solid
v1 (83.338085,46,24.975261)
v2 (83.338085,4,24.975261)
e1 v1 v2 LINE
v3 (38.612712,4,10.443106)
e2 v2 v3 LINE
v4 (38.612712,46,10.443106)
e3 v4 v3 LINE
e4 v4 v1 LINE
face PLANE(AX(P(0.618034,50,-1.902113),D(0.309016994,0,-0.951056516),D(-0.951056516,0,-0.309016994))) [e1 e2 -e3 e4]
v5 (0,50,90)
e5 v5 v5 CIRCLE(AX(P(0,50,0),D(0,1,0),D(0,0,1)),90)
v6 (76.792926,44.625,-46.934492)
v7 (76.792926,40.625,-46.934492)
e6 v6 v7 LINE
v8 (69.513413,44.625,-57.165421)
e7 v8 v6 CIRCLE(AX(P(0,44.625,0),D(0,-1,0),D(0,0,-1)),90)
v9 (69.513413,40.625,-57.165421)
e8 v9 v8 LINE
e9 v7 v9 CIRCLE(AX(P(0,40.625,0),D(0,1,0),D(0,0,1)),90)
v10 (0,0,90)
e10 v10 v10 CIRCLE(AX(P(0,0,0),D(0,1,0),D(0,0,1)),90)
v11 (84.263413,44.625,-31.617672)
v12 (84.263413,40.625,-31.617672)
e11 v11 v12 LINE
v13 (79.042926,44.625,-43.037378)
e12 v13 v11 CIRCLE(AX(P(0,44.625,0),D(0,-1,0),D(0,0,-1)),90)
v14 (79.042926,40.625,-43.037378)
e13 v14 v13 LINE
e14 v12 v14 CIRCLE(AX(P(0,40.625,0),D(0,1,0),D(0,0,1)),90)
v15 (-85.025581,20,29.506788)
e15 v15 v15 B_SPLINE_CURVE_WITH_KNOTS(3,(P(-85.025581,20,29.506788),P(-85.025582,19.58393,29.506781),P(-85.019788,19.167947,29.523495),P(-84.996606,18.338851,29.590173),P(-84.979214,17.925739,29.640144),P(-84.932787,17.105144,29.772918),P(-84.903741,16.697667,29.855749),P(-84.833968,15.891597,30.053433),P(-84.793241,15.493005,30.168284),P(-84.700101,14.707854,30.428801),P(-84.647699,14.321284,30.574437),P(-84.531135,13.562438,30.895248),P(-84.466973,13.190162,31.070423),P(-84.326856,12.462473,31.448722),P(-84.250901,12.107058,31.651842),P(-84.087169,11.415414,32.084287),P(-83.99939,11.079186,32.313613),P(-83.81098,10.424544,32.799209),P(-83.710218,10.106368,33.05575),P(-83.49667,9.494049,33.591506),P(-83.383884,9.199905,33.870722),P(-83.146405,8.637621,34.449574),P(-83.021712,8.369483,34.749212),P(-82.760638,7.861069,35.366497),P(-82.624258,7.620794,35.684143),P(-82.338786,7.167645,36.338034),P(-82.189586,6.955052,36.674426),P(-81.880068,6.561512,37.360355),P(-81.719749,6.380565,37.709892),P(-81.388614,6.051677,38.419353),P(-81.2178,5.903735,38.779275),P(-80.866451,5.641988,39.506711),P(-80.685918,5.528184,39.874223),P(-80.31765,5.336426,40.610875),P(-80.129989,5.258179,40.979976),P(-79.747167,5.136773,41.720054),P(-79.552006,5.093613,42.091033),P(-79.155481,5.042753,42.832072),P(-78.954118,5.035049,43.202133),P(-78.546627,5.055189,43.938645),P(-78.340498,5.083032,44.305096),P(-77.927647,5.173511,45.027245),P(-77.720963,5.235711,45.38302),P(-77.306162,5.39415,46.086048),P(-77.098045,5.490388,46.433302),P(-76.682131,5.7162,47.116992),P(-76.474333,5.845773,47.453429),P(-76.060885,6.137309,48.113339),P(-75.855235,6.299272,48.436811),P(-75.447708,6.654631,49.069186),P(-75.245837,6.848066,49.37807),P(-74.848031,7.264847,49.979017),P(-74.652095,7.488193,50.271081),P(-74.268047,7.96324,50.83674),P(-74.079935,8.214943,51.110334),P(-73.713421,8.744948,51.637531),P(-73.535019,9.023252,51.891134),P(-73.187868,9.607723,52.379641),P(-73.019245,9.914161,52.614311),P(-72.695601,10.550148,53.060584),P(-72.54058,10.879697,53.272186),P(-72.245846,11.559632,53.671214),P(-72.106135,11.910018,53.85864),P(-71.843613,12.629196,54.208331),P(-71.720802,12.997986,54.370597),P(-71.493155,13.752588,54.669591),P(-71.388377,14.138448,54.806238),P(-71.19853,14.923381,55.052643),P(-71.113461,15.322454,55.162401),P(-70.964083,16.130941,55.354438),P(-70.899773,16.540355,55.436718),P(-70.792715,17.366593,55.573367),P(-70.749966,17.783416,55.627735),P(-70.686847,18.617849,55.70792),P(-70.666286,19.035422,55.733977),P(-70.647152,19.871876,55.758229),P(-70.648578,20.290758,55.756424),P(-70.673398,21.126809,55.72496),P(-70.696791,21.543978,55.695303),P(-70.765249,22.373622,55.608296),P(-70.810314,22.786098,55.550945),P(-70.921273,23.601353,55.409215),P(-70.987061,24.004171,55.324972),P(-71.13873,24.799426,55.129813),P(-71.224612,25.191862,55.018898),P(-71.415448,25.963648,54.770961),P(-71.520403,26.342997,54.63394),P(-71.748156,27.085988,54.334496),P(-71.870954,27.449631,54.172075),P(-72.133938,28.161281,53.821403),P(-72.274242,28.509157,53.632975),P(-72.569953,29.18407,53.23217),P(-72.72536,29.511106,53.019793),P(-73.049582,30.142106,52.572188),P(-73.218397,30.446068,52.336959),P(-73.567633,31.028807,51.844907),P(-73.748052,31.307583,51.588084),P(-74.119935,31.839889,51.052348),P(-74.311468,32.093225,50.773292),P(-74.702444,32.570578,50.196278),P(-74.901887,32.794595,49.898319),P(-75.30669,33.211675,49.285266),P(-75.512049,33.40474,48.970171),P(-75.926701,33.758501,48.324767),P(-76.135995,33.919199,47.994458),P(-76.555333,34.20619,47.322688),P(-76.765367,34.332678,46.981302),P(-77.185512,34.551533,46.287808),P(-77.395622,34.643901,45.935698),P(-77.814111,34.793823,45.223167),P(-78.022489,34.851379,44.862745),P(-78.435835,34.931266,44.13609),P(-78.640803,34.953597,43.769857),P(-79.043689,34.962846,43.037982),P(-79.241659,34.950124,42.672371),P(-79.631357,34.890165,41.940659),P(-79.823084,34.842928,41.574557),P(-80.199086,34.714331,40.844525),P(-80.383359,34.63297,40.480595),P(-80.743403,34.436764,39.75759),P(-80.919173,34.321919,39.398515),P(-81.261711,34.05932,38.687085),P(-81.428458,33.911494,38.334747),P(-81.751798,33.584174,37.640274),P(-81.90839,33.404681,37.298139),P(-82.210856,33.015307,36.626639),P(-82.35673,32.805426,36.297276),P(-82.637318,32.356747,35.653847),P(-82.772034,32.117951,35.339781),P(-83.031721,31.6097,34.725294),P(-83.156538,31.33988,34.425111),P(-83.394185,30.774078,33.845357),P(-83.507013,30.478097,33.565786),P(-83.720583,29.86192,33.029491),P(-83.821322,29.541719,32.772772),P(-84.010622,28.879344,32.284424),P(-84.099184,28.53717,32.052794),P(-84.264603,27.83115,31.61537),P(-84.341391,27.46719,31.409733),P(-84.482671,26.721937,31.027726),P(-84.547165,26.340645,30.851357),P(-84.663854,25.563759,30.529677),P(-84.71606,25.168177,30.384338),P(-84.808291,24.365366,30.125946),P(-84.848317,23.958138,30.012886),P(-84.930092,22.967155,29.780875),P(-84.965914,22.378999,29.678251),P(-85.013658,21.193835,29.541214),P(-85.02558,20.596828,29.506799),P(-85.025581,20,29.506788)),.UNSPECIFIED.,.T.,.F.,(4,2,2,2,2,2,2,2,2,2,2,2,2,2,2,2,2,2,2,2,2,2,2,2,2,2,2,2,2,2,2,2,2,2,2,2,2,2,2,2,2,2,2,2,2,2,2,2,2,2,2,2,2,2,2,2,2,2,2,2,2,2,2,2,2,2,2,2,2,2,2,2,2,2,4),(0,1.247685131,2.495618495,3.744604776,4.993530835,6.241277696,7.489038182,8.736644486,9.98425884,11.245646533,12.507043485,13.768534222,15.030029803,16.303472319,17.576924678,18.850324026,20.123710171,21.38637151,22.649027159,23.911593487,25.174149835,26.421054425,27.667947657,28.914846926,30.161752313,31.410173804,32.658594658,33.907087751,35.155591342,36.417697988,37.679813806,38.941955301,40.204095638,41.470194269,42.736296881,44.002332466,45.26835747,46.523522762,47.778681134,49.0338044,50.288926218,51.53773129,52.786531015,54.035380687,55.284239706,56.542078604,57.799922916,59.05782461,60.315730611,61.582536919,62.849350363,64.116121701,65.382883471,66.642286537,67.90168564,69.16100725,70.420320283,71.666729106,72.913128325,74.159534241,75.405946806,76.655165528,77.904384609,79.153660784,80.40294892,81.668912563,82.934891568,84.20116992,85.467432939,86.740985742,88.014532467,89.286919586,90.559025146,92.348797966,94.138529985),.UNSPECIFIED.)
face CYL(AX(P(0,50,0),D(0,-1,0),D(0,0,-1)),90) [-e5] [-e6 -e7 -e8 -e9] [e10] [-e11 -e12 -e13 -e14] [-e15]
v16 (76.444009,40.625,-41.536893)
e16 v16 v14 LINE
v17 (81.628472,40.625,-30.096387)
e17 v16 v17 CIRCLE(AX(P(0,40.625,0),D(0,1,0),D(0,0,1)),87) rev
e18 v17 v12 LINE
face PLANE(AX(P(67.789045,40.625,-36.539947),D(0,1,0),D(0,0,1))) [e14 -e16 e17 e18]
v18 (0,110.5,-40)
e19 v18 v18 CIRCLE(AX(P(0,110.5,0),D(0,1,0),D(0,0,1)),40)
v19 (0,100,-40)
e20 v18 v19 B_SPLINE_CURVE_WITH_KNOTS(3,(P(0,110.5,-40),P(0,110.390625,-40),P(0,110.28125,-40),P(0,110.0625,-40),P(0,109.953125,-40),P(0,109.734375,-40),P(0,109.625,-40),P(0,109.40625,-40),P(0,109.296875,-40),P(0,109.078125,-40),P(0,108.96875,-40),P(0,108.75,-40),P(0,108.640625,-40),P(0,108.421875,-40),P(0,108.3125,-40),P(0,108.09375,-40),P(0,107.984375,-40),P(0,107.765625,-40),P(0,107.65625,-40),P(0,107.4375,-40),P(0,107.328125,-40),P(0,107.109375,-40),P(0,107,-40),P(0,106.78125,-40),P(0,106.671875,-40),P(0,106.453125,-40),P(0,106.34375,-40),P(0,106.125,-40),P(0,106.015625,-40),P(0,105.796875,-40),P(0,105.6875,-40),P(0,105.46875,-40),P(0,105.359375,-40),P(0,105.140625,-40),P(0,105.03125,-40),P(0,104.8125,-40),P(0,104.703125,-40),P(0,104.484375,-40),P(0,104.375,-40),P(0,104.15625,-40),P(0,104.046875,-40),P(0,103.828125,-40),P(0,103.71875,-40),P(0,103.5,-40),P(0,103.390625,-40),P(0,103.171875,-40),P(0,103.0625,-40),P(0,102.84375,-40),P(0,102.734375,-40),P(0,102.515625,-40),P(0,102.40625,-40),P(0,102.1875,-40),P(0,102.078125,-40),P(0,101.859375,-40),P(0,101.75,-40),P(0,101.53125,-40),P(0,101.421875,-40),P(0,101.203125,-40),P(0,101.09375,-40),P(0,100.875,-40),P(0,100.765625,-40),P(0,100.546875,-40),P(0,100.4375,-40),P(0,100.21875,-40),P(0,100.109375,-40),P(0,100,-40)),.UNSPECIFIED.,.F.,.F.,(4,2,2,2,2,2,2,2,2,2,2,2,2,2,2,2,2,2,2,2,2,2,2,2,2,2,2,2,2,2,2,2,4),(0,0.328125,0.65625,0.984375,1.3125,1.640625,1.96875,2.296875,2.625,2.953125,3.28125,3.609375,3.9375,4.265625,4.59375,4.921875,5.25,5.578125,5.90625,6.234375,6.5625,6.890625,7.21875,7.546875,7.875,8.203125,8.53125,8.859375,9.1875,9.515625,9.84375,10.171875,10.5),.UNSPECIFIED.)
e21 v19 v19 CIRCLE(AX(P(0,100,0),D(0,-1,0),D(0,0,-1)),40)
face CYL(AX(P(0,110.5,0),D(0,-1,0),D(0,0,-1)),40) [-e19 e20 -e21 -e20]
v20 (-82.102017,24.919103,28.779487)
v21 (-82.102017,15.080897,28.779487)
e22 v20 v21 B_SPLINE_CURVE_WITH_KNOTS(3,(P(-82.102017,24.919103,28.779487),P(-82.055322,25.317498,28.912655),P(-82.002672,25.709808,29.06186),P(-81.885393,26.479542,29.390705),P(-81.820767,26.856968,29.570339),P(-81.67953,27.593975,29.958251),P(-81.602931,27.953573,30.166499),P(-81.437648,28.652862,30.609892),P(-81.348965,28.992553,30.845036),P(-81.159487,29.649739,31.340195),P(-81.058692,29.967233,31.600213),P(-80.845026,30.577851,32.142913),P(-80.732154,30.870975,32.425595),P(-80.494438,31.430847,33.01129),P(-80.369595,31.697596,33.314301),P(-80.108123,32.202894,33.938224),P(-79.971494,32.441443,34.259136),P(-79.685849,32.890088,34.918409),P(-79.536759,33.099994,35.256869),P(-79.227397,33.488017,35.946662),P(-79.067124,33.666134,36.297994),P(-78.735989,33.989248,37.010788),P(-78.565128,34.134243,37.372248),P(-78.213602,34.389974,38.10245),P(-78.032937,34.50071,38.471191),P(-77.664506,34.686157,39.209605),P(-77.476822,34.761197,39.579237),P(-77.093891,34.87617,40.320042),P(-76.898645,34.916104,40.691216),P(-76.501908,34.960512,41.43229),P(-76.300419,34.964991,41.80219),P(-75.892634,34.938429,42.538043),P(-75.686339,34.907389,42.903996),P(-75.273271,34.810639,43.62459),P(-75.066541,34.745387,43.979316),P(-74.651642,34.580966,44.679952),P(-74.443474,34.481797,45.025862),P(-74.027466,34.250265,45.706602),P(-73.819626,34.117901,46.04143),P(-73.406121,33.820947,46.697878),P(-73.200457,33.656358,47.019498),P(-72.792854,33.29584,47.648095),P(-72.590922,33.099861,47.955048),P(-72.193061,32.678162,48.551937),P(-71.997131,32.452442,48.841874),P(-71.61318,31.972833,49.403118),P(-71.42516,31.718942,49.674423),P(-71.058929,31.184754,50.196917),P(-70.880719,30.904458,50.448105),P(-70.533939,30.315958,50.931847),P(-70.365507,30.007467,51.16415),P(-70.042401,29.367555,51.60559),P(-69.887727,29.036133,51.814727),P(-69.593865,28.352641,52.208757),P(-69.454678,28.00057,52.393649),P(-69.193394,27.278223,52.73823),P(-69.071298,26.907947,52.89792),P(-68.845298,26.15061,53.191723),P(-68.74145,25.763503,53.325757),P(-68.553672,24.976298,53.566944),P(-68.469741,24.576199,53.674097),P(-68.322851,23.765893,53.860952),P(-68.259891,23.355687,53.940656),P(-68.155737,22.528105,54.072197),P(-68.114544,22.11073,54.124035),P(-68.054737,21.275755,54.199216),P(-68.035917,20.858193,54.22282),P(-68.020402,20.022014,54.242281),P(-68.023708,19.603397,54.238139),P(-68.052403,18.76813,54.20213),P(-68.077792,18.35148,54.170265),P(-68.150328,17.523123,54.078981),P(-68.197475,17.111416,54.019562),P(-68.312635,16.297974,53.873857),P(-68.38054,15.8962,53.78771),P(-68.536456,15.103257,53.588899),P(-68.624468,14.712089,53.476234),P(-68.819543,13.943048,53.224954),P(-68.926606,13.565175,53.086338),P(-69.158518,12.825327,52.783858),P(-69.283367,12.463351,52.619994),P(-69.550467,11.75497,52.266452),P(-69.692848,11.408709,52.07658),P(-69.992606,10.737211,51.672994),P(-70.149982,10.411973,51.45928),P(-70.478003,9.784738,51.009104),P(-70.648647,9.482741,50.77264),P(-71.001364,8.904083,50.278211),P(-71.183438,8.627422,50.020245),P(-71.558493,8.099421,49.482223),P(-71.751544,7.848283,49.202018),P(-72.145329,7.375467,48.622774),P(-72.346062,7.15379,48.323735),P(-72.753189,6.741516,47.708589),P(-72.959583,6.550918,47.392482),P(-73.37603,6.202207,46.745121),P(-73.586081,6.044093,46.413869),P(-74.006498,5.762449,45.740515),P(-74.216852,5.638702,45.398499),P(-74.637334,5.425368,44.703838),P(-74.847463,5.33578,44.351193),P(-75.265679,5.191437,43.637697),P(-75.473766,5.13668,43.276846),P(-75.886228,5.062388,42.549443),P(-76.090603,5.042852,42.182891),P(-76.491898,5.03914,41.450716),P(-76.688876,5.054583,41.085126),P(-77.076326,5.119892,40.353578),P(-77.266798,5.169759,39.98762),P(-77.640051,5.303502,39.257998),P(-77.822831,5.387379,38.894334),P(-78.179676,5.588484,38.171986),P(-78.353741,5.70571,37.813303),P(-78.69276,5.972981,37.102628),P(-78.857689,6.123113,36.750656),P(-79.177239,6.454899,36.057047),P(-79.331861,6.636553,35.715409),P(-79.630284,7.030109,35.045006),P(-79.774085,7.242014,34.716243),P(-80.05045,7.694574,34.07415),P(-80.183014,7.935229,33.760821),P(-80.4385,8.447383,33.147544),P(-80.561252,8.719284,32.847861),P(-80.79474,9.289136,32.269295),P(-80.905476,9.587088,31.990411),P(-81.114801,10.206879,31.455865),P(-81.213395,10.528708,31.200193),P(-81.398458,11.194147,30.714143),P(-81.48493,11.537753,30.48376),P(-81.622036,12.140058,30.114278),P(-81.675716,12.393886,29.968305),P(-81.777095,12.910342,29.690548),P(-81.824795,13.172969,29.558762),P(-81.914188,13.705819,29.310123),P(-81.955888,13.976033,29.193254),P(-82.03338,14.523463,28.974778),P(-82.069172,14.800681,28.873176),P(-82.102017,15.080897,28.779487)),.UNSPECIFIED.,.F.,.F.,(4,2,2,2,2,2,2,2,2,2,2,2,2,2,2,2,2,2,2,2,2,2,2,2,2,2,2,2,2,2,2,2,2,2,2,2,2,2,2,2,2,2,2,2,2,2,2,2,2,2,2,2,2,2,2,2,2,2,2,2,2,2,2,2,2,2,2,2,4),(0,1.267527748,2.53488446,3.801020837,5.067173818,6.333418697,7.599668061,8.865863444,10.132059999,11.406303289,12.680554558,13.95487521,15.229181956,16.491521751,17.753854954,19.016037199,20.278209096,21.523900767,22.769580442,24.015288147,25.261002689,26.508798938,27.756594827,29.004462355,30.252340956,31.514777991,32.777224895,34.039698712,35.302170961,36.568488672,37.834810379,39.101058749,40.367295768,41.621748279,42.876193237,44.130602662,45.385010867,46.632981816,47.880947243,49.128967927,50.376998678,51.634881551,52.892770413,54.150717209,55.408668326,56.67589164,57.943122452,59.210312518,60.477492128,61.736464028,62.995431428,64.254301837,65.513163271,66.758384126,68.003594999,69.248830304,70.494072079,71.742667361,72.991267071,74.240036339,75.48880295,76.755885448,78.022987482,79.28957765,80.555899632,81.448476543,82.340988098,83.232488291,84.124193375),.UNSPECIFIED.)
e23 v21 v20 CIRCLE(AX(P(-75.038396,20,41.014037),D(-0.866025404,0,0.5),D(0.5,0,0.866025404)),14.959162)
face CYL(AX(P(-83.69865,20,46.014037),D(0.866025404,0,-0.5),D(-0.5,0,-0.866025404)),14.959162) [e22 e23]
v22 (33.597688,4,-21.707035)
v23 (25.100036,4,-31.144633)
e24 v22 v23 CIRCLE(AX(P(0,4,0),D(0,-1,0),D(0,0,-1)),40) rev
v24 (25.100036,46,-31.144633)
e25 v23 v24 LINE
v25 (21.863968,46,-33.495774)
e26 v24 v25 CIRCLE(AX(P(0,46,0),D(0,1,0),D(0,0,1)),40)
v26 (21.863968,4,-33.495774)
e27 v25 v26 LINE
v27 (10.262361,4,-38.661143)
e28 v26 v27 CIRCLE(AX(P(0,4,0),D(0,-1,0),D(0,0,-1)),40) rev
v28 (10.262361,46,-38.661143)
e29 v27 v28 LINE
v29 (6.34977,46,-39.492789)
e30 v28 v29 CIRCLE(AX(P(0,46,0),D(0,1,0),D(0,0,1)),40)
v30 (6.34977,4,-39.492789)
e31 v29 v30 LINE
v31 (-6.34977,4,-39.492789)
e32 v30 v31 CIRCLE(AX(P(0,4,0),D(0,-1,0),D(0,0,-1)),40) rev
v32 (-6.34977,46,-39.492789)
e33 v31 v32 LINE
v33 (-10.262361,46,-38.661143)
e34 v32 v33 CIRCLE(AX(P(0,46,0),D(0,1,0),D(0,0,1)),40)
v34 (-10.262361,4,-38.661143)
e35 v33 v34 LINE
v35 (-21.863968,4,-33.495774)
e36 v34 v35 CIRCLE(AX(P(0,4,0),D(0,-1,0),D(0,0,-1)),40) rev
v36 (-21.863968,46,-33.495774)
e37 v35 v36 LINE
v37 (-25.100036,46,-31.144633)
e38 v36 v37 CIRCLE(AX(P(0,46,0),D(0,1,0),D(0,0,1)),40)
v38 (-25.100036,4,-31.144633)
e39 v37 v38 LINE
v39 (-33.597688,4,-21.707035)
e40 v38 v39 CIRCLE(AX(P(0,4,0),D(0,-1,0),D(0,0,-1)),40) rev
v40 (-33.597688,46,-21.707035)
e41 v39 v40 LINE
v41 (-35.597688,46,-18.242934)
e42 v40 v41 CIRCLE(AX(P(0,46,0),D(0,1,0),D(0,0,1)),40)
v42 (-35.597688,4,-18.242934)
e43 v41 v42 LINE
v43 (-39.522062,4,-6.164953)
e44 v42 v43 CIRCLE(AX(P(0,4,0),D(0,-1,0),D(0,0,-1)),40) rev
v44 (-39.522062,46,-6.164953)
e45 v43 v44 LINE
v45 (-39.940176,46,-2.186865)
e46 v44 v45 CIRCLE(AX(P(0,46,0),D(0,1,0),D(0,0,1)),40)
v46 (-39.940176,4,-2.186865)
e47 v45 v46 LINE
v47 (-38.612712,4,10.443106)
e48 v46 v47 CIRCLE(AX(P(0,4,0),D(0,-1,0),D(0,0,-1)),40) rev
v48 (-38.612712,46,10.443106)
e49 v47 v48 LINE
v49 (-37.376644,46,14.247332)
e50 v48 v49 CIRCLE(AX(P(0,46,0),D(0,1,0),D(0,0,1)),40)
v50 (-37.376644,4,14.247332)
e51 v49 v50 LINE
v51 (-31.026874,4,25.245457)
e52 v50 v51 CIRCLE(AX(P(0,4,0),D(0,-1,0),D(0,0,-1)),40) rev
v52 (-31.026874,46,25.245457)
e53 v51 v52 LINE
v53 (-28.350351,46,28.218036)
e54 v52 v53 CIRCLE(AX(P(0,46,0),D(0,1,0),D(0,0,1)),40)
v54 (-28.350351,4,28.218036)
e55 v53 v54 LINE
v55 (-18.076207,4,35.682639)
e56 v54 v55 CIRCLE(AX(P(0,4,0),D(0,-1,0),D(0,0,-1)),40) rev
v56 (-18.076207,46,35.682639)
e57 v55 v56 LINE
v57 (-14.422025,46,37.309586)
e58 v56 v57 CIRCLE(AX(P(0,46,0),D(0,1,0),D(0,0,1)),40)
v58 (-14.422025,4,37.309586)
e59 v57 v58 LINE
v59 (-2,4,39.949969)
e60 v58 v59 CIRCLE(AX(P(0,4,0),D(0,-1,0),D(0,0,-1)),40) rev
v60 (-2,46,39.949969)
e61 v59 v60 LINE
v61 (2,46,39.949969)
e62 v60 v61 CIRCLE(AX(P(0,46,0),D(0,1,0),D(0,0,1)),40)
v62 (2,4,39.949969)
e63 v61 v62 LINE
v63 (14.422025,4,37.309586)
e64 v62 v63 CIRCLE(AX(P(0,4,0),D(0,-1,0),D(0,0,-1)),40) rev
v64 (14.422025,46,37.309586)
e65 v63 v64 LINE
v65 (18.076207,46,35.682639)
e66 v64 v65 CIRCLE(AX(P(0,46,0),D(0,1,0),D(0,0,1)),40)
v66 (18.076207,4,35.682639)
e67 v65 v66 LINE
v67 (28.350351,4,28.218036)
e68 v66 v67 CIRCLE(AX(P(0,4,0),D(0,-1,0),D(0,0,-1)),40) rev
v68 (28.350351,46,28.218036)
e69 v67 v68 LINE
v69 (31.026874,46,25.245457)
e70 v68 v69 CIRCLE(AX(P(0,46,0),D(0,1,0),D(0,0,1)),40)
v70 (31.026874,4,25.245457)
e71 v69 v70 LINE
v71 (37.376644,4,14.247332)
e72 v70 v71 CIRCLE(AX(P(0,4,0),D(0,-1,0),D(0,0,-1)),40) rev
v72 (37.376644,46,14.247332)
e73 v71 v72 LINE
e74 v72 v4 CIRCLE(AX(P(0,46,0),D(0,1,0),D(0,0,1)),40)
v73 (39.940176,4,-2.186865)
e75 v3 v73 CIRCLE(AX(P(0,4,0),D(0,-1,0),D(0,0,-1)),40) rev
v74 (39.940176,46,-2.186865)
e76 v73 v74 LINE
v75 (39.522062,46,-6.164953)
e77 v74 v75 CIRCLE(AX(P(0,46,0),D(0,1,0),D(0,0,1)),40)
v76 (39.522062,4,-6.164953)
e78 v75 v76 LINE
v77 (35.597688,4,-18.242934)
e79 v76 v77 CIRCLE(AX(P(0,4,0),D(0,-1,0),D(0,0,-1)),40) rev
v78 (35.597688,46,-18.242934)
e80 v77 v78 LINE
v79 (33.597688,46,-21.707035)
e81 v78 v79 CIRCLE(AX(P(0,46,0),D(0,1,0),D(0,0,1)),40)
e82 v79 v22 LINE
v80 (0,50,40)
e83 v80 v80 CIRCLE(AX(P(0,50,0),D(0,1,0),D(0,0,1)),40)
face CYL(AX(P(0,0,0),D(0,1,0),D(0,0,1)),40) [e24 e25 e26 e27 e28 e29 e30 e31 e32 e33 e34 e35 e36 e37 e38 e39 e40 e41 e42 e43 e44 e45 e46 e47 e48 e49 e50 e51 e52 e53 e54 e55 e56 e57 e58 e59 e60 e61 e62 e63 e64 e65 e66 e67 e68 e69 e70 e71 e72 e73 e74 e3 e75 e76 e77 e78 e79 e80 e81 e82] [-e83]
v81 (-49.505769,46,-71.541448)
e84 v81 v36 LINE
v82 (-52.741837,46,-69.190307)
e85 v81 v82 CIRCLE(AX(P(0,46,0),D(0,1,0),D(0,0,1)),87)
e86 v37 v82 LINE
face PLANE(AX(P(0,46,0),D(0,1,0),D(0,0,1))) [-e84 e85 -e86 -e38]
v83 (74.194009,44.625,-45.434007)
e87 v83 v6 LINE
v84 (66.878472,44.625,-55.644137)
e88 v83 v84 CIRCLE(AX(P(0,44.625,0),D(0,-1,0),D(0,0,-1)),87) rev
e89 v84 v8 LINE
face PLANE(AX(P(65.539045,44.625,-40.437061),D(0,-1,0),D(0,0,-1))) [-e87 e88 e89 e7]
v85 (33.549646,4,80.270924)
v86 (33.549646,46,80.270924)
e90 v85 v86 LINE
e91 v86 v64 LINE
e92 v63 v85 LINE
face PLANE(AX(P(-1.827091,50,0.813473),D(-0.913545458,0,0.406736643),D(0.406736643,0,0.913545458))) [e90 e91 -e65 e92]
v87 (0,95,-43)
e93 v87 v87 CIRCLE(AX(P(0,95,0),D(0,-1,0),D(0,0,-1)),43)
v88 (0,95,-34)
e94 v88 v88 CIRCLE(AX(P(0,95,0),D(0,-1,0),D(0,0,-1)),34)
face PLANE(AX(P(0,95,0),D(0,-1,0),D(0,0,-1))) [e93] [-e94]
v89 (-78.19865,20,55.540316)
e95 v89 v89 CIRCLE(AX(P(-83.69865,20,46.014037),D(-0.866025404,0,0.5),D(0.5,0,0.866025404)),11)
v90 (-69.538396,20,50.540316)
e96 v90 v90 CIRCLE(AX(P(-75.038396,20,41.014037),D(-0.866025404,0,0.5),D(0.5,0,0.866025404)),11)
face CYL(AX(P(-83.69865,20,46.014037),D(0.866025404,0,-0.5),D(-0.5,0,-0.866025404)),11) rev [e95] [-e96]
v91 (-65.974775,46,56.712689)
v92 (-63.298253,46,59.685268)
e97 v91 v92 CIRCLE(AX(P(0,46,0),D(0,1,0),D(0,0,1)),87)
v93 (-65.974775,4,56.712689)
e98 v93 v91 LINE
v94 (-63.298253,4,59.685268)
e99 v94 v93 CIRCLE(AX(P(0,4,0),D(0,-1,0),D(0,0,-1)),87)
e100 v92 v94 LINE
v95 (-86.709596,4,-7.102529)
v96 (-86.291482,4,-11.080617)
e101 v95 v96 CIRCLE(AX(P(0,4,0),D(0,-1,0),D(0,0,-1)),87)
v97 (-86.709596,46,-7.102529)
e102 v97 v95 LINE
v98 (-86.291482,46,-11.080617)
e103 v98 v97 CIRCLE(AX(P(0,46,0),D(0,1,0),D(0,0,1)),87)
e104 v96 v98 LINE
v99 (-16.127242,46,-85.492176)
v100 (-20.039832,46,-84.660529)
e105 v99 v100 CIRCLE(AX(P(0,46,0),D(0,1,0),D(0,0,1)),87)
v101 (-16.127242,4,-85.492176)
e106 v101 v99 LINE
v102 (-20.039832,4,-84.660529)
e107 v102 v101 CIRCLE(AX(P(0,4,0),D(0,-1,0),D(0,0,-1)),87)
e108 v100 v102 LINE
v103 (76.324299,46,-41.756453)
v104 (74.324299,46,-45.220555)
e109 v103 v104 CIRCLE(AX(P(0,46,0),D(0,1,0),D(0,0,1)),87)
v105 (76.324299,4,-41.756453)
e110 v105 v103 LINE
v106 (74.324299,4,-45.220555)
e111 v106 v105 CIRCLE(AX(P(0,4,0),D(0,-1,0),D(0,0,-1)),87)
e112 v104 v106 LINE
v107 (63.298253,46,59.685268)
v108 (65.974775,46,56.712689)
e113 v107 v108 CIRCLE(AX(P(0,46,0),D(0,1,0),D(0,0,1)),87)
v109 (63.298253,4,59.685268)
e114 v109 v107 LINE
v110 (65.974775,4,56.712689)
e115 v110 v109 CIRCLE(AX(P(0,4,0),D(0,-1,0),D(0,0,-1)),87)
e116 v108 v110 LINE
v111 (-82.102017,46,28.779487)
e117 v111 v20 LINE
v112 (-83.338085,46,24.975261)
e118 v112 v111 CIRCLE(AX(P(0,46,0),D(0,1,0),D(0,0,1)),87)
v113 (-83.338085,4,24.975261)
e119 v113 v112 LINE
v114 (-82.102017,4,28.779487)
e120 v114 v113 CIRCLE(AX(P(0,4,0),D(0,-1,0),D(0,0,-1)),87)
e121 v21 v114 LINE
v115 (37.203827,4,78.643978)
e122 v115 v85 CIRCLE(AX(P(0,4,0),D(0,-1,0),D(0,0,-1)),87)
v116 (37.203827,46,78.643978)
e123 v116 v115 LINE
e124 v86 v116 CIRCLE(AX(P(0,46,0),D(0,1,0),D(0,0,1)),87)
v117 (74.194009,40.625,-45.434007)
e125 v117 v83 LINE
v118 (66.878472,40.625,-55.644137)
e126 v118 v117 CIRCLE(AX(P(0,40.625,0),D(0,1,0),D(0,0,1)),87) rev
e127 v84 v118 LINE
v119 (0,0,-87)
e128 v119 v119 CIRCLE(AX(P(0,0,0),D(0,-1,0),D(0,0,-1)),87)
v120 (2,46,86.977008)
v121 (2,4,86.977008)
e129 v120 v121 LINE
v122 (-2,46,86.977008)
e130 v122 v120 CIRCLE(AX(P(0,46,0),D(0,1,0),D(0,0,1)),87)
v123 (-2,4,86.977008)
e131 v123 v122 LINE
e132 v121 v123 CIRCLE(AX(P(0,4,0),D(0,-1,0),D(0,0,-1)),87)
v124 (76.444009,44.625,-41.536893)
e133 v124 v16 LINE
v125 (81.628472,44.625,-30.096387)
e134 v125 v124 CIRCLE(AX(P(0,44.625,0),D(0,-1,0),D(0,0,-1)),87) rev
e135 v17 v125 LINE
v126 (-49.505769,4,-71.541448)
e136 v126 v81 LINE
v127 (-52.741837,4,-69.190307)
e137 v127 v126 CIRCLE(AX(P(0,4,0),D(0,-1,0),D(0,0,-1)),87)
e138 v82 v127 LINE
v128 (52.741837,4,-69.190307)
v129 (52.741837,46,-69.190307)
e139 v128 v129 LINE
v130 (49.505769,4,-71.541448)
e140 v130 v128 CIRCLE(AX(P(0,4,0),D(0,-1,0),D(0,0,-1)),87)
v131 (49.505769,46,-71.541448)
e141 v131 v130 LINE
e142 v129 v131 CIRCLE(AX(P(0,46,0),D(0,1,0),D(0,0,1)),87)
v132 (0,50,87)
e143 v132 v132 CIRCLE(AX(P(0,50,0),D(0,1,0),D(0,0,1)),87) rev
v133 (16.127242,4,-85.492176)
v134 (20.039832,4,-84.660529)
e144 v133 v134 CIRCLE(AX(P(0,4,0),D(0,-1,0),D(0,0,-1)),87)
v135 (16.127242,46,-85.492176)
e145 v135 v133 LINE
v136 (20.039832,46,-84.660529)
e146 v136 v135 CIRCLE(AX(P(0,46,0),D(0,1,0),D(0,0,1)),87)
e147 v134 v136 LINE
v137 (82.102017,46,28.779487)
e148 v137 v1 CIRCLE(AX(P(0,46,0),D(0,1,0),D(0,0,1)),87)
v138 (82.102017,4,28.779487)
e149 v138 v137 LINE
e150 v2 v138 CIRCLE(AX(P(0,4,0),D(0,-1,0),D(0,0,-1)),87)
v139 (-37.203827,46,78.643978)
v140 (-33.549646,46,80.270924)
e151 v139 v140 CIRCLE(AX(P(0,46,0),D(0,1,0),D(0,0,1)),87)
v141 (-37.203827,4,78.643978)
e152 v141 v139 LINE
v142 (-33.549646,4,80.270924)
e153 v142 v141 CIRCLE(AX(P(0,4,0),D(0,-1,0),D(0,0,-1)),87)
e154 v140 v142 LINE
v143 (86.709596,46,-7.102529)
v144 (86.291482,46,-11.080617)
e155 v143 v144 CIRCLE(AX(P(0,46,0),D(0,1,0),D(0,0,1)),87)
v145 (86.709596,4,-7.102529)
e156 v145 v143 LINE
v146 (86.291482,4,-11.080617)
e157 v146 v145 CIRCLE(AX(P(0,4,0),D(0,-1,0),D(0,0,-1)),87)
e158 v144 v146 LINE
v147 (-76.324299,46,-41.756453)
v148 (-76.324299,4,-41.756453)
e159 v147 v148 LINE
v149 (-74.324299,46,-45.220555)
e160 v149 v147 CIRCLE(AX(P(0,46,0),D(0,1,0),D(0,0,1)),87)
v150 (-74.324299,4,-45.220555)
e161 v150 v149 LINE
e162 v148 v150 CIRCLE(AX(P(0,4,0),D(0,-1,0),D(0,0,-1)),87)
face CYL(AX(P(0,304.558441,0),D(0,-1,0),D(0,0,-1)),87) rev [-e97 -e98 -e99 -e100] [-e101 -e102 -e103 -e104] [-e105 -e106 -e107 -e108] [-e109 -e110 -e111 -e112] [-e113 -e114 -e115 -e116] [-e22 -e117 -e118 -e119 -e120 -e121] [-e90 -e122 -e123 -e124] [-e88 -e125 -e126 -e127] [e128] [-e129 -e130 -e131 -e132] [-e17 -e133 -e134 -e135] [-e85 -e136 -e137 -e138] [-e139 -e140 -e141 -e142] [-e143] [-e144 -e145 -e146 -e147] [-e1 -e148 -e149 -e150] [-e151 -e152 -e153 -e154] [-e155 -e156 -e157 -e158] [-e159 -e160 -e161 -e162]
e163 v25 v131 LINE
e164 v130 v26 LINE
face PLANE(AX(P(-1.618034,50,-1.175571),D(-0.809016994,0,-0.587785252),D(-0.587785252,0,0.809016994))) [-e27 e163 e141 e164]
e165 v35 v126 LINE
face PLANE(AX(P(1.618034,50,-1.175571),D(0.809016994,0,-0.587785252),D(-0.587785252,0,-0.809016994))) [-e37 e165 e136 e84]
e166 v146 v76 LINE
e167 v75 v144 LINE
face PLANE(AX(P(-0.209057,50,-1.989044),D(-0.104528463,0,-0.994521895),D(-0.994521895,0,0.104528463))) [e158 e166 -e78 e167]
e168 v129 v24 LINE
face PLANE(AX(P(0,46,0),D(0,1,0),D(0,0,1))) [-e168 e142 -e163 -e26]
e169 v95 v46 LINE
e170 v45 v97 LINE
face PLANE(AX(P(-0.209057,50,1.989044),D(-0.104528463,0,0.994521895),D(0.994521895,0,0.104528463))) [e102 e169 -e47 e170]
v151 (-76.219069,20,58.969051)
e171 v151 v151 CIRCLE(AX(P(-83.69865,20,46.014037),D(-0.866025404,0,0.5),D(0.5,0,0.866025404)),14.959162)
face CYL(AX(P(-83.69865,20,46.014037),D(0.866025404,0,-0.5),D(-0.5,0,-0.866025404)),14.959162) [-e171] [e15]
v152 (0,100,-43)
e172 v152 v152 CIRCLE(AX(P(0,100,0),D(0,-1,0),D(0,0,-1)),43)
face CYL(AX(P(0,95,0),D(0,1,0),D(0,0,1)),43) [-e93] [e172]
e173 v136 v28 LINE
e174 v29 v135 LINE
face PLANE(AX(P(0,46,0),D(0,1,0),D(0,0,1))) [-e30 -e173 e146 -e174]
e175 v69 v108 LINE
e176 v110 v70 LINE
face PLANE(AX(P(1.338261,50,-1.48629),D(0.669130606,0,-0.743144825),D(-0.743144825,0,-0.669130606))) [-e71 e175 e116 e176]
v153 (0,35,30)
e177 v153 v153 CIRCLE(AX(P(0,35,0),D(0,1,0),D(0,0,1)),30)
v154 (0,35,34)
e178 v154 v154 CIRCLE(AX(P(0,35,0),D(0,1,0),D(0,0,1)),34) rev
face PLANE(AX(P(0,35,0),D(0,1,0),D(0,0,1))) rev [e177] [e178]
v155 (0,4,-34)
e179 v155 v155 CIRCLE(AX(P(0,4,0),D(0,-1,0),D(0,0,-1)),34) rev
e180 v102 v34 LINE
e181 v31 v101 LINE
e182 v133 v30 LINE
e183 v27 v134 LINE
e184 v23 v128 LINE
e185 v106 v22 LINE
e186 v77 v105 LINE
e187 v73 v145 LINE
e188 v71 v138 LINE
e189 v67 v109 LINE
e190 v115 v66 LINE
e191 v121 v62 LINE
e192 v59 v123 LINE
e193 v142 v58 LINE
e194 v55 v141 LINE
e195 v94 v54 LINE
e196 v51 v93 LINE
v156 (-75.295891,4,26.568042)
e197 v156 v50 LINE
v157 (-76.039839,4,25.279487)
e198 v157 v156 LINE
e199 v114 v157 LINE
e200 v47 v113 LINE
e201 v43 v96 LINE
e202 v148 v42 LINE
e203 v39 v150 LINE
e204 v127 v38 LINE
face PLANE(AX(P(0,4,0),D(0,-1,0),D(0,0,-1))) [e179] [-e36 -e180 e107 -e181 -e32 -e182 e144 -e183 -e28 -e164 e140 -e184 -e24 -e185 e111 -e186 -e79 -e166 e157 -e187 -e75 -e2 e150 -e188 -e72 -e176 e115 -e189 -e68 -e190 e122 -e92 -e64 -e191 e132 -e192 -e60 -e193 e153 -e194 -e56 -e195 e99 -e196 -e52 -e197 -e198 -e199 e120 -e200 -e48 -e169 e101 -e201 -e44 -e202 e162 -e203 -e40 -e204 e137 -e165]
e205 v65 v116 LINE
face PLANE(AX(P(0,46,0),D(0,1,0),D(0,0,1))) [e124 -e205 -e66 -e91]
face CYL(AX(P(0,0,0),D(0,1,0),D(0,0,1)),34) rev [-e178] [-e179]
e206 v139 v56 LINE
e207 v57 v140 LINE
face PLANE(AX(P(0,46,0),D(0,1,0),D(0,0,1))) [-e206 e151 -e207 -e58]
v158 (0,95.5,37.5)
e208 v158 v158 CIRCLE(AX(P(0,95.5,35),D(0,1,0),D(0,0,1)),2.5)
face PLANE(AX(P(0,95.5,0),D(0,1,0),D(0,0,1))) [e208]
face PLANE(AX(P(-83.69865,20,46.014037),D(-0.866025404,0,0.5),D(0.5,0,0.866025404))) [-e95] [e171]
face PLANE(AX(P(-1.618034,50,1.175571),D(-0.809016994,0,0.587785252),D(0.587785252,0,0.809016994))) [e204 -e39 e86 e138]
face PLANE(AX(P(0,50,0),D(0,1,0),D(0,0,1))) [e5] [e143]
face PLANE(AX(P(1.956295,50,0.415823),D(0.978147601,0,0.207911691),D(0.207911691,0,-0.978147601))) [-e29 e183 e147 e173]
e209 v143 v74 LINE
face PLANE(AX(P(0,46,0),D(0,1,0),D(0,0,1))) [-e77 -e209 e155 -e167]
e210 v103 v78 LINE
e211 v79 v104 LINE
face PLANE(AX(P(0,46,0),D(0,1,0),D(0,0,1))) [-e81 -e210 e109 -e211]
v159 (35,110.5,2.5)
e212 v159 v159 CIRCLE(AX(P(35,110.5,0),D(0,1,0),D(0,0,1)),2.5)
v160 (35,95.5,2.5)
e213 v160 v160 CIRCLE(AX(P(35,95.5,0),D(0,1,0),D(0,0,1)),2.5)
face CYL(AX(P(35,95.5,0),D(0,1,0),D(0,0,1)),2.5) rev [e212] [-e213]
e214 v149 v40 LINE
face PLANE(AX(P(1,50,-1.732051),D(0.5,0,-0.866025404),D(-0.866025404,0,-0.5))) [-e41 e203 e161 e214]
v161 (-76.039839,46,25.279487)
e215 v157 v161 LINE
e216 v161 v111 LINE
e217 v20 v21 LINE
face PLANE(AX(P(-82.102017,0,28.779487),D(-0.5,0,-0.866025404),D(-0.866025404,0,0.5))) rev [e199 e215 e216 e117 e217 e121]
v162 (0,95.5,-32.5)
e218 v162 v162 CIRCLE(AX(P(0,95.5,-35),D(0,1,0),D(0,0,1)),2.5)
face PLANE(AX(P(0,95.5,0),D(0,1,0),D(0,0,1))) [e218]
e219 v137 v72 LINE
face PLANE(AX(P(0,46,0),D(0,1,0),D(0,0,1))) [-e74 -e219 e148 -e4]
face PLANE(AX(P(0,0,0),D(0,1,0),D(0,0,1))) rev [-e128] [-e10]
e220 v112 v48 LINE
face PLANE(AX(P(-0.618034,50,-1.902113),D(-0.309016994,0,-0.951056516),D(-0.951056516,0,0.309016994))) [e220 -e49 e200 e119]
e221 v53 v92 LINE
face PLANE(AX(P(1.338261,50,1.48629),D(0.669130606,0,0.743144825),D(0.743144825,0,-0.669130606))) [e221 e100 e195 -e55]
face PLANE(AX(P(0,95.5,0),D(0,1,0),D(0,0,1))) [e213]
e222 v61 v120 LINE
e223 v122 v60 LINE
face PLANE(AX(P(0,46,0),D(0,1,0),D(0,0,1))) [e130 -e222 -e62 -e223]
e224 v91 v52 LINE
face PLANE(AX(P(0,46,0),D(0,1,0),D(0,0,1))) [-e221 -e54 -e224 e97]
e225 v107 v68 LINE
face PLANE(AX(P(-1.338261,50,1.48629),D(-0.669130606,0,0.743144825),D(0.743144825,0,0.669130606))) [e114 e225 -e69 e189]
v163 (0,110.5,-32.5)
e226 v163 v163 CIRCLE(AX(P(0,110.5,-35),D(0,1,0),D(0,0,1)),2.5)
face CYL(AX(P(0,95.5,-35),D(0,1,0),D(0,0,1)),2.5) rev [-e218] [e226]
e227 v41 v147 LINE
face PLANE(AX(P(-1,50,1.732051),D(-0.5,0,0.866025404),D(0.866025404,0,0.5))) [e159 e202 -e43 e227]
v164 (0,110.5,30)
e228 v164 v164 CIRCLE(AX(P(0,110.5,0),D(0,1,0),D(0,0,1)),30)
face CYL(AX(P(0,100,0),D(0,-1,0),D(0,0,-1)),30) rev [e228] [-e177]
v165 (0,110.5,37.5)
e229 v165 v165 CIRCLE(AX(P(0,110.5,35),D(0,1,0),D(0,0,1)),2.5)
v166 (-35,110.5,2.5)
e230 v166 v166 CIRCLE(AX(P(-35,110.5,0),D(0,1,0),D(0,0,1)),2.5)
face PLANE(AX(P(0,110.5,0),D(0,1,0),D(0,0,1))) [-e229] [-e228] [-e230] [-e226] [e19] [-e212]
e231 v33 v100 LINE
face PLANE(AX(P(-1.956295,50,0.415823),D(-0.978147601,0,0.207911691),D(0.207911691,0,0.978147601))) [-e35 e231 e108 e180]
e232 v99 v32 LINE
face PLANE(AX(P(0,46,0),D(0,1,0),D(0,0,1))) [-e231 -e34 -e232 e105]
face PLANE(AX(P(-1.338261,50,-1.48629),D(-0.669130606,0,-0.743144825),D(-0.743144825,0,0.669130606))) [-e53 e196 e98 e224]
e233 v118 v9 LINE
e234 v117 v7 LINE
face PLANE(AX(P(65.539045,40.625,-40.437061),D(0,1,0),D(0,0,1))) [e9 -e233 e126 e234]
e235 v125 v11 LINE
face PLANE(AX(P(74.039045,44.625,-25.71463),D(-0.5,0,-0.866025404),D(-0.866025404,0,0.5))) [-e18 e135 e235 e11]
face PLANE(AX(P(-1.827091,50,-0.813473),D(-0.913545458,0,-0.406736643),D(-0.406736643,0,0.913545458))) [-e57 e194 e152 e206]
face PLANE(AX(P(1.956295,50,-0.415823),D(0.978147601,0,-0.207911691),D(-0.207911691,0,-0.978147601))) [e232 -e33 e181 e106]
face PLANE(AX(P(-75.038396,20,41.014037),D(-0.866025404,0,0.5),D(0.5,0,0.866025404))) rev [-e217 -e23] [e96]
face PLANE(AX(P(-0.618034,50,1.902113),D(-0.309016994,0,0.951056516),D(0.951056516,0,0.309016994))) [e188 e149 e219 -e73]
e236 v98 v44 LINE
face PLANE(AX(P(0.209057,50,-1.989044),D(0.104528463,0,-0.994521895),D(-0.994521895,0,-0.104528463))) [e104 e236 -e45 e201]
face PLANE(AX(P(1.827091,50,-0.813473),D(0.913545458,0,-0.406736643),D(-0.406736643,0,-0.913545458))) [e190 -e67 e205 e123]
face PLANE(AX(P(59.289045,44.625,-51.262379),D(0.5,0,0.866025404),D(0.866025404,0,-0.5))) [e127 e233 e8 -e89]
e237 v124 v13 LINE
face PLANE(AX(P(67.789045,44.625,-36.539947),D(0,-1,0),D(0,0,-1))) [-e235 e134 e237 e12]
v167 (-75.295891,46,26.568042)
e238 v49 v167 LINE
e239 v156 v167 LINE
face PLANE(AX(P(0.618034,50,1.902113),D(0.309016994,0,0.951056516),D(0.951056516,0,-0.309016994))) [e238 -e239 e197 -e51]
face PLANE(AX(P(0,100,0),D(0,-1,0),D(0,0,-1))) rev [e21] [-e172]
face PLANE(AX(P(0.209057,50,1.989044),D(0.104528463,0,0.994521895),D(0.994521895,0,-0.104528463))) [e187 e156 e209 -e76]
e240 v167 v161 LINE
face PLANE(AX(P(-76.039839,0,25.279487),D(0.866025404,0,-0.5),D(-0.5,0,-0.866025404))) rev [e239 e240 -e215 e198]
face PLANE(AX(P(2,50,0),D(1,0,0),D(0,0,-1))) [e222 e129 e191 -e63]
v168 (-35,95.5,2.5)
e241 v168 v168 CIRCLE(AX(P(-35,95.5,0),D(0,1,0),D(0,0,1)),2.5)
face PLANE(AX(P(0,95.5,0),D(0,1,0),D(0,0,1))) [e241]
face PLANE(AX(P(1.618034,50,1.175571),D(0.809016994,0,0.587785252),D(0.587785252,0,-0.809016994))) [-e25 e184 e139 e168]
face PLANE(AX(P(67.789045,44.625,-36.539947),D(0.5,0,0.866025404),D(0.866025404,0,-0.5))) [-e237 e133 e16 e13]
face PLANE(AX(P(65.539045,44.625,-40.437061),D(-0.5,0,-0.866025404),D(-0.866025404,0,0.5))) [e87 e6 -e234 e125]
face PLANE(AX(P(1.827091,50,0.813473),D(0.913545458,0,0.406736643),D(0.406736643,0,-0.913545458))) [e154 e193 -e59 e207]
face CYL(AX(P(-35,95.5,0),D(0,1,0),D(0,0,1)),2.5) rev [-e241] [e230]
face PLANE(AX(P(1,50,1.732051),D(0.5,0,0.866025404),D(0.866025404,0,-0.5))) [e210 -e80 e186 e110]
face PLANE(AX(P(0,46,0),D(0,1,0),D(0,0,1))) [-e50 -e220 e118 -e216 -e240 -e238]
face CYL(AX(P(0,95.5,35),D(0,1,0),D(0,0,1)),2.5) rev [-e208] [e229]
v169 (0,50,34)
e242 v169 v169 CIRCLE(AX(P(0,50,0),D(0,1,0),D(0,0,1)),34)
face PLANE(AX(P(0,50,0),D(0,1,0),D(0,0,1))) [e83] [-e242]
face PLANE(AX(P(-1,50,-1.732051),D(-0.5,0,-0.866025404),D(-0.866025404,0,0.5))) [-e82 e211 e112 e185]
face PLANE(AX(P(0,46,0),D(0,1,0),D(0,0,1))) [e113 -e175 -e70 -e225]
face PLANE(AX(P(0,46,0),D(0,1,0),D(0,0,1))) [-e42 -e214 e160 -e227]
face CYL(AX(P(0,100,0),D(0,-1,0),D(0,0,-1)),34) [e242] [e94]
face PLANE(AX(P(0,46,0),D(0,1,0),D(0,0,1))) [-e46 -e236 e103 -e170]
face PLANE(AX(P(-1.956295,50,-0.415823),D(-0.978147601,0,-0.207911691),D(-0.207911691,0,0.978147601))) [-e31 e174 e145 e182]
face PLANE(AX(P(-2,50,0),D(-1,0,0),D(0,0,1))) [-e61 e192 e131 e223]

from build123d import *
from build123d.topology import SkipClean

# Parameters (mm, degrees)
SKETCH1_R                = 90
BOSS_EXTRUDE1_DEPTH      = 50
CUT_EXTRUDE1_DEPTH       = 50
SKETCH4_R                = 40
CUT_EXTRUDE2_DEPTH       = 137.546695512
SKETCH5_R                = 40
SKETCH5_R_2              = 34
BOSS_EXTRUDE2_DEPTH      = 50
BOSS_EXTRUDE3_DEPTH      = 50
BOSS_EXTRUDE3_DEPTH_BACK = 15
SKETCH9_R                = 34
SKETCH9_R_2              = 30
SKETCH10_R               = 40
SKETCH10_R_2             = 30
BOSS_EXTRUDE4_DEPTH      = 10.5
SKETCH11_R               = 90
SKETCH11_R_2             = 87
BOSS_EXTRUDE5_DEPTH      = 50
SKETCH12_R               = 87
SKETCH12_R_2             = 40
CUT_EXTRUDE3_DEPTH       = 4
SKETCH13_R               = 87
CUT_EXTRUDE4_DEPTH       = 4
SKETCH15_R               = 43
SKETCH15_R_2             = 34
BOSS_EXTRUDE6_DEPTH      = 5
SKETCH14_R               = 2.5
CUT_EXTRUDE5_DEPTH       = 15
CUT_EXTRUDE6_DEPTH       = 10
CUT_EXTRUDE6_DEPTH_BACK  = 10
SKETCH16_W               = 12.5
SKETCH16_H               = 4
CUT_EXTRUDE7_DEPTH       = 10
CUT_EXTRUDE7_DEPTH_BACK  = 10
SKETCH19_R               = 11
SKETCH20_R               = 14.959162181
SKETCH20_R_2             = 11
BOSS_EXTRUDE7_DEPTH      = 10
CUT_EXTRUDE8_DEPTH       = 144.435420439


with BuildPart() as part:
    # Sketch1 → Boss-Extrude1 (new body)
    with BuildSketch(Plane(origin=(0, 0, 0), x_dir=(1, 0, 0), z_dir=(0, 1, 0))):
        with Locations(Location((0, 0, 0), (0, 0, 270))):
            Circle(SKETCH1_R)
    extrude(amount=BOSS_EXTRUDE1_DEPTH)

    # Sketch2 → Cut-Extrude1 (cut)
    with BuildSketch(Plane.XZ):
        with BuildLine():
            Line((-2, 9.409260219), (-2, 89.977775034))
            ThreePointArc((-2, 89.977775034), (-18.712052174, 88.033284066), (-34.770167253, 83.012260957))
            Line((-34.770167253, 83.012260957), (-2, 9.409260219))
        make_face()
        with BuildLine():
            ThreePointArc((34.770167253, 83.012260957), (18.712052174, 88.033284066), (2, 89.977775034))
            Line((2, 89.977775034), (2, 9.409260219))
            Line((2, 9.409260219), (34.770167253, 83.012260957))
        make_face()
        with BuildLine():
            Line((-5.654181831, 7.782313647), (-38.424349084, 81.385314385))
            ThreePointArc((-38.424349084, 81.385314385), (-52.900672706, 72.811529494), (-65.528256711, 61.693172818))
            Line((-65.528256711, 61.693172818), (-5.654181831, 7.782313647))
        make_face()
        with BuildLine():
            ThreePointArc((65.528256711, 61.693172818), (52.900672706, 72.811529494), (38.424349084, 81.385314385))
            Line((38.424349084, 81.385314385), (5.654181831, 7.782313647))
            Line((5.654181831, 7.782313647), (65.528256711, 61.693172818))
        make_face()
        with BuildLine():
            Line((-8.330704256, 4.809734345), (-68.204779137, 58.720593516))
            ThreePointArc((-68.204779137, 58.720593516), (-77.942286341, 45), (-84.955915279, 29.706774634))
            Line((-84.955915279, 29.706774634), (-8.330704256, 4.809734345))
        make_face()
        with BuildLine():
            ThreePointArc((84.955915279, 29.706774634), (77.942286341, 45), (68.204779137, 58.720593516))
            Line((68.204779137, 58.720593516), (8.330704256, 4.809734345))
            Line((8.330704256, 4.809734345), (84.955915279, 29.706774634))
        make_face()
        with BuildLine():
            Line((-9.566772234, 1.00550828), (-86.191983256, 25.902548569))
            ThreePointArc((-86.191983256, 25.902548569), (-89.506970583, 9.407561694), (-89.693924294, -7.416194762))
            Line((-89.693924294, -7.416194762), (-9.566772234, 1.00550828))
        make_face()
        with BuildLine():
            ThreePointArc((89.693924294, -7.416194762), (89.506970583, 9.407561694), (86.191983256, 25.902548569))
            Line((86.191983256, 25.902548569), (9.566772234, 1.00550828))
            Line((9.566772234, 1.00550828), (89.693924294, -7.416194762))
        make_face()
        with BuildLine():
            Line((-9.14865838, -2.972579302), (-89.275810441, -11.394282343))
            ThreePointArc((-89.275810441, -11.394282343), (-85.595086467, -27.811529494), (-78.923038955, -43.256836709))
            Line((-78.923038955, -43.256836709), (-9.14865838, -2.972579302))
        make_face()
        with BuildLine():
            Line((89.275810441, -11.394282343), (9.14865838, -2.972579302))
            Line((9.14865838, -2.972579302), (78.923038955, -43.256836709))
            ThreePointArc((78.923038955, -43.256836709), (85.595086467, -27.811529494), (89.275810441, -11.394282343))
        make_face()
        with BuildLine():
            Line((-7.14865838, -6.436680917), (-76.923038955, -46.720938324))
            ThreePointArc((-76.923038955, -46.720938324), (-66.883034293, -60.221754572), (-54.505643188, -71.617978614))
            Line((-54.505643188, -71.617978614), (-7.14865838, -6.436680917))
        make_face()
        with BuildLine():
            Line((76.923038955, -46.720938324), (7.14865838, -6.436680917))
            Line((7.14865838, -6.436680917), (54.505643188, -71.617978614))
            ThreePointArc((54.505643188, -71.617978614), (66.883034293, -60.221754572), (76.923038955, -46.720938324))
        make_face()
        with BuildLine():
            Line((-3.912590403, -8.787821926), (-51.26957521, -73.969119623))
            ThreePointArc((-51.26957521, -73.969119623), (-36.606297877, -82.219091188), (-20.663726545, -87.595721387))
            Line((-20.663726545, -87.595721387), (-3.912590403, -8.787821926))
        make_face()
        with BuildLine():
            Line((51.26957521, -73.969119623), (3.912590403, -8.787821926))
            Line((3.912590403, -8.787821926), (20.663726545, -87.595721387))
            ThreePointArc((20.663726545, -87.595721387), (36.606297877, -82.219091188), (51.26957521, -73.969119623))
        make_face()
        with BuildLine():
            Line((0, -9.619468689), (-16.751136142, -88.42736815))
            ThreePointArc((-16.751136142, -88.42736815), (0, -90), (16.751136142, -88.42736815))
            Line((16.751136142, -88.42736815), (0, -9.619468689))
        make_face()
    extrude(amount=-CUT_EXTRUDE1_DEPTH, mode=Mode.SUBTRACT)

    # Sketch4 → Cut-Extrude2 (cut, through all)
    with BuildSketch(Plane(origin=(0, 50, 0), x_dir=(1, 0, 0), z_dir=(0, 1, 0))):
        Circle(SKETCH4_R)
    extrude(amount=-CUT_EXTRUDE2_DEPTH, mode=Mode.SUBTRACT)


with BuildPart() as cut_extrude2_piece_1:
    # of the separate pieces the step leaves, piece 1, a body of its own (cut_extrude2_pieces)
    add(part.part.solids().sort_by_distance((-84.955915279, 0, 29.706774634))[0])


with BuildPart() as cut_extrude2_piece_2:
    # of the separate pieces the step leaves, piece 2, a body of its own (cut_extrude2_pieces)
    add(part.part.solids().sort_by_distance((-65.528256711, 0, 61.693172818))[0])


with BuildPart() as cut_extrude2_piece_3:
    # of the separate pieces the step leaves, piece 3, a body of its own (cut_extrude2_pieces)
    add(part.part.solids().sort_by_distance((10.262360744, 0, -38.661142662))[0])


with BuildPart() as cut_extrude2_piece_4:
    # of the separate pieces the step leaves, piece 4, a body of its own (cut_extrude2_pieces)
    add(part.part.solids().sort_by_distance((14.422025249, 0, 37.309585735))[0])


with BuildPart() as cut_extrude2_piece_5:
    # of the separate pieces the step leaves, piece 5, a body of its own (cut_extrude2_pieces)
    add(part.part.solids().sort_by_distance((-2, 0, 89.977775034))[0])


with BuildPart() as cut_extrude2_piece_6:
    # of the separate pieces the step leaves, piece 6, a body of its own (cut_extrude2_pieces)
    add(part.part.solids().sort_by_distance((39.940175529, 0, -2.186865046))[0])


with BuildPart() as cut_extrude2_piece_7:
    # of the separate pieces the step leaves, piece 7, a body of its own (cut_extrude2_pieces)
    add(part.part.solids().sort_by_distance((25.100036427, 0, -31.144633107))[0])


with BuildPart() as cut_extrude2_piece_8:
    # of the separate pieces the step leaves, piece 8, a body of its own (cut_extrude2_pieces)
    add(part.part.solids().sort_by_distance((-34.770167253, 0, 83.012260957))[0])


with BuildPart() as cut_extrude2_piece_9:
    # of the separate pieces the step leaves, piece 9, a body of its own (cut_extrude2_pieces)
    add(part.part.solids().sort_by_distance((28.350351313, 0, 28.218036438))[0])


with BuildPart() as cut_extrude2_piece_10:
    # of the separate pieces the step leaves, piece 10, a body of its own (cut_extrude2_pieces)
    add(part.part.solids().sort_by_distance((-20.663726545, 0, -87.595721387))[0])


with BuildPart() as cut_extrude2_piece_11:
    # of the separate pieces the step leaves, piece 11, a body of its own (cut_extrude2_pieces)
    add(part.part.solids().sort_by_distance((-54.505643188, 0, -71.617978614))[0])


with BuildPart() as cut_extrude2_piece_12:
    # of the separate pieces the step leaves, piece 12, a body of its own (cut_extrude2_pieces)
    add(part.part.solids().sort_by_distance((37.37664408, 0, 14.247332289))[0])


with BuildPart() as cut_extrude2_piece_13:
    # of the separate pieces the step leaves, piece 13, a body of its own (cut_extrude2_pieces)
    add(part.part.solids().sort_by_distance((35.597687784, 0, -18.242933548))[0])


with BuildPart() as cut_extrude2_piece_14:
    # of the separate pieces the step leaves, piece 14, a body of its own (cut_extrude2_pieces)
    add(part.part.solids().sort_by_distance((-89.693924294, 0, -7.416194762))[0])


with BuildPart() as cut_extrude2_piece_15:
    # of the separate pieces the step leaves, piece 15, a body of its own (cut_extrude2_pieces)
    add(part.part.solids().sort_by_distance((-78.923038955, 0, -43.256836709))[0])


with BuildPart() as body_16:
    # Sketch5 → Boss-Extrude2 (new body)
    with BuildSketch(Plane(origin=(0, 50, 0), x_dir=(1, 0, 0), z_dir=(0, 1, 0))):
        with Locations(Location((0, 0, 0), (0, 0, 270))):
            Circle(SKETCH5_R)
        with Locations(Location((0, 0, 0), (0, 0, 270))):
            Circle(SKETCH5_R_2, mode=Mode.SUBTRACT)
    extrude(amount=-BOSS_EXTRUDE2_DEPTH)

    # Sketch9 → Boss-Extrude3 (add, two sides: drawn at the far end of the back side and taken through both)
    with BuildSketch(Plane(origin=(0, 50, 0), x_dir=(1, 0, 0), z_dir=(0, 1, 0)).offset(-BOSS_EXTRUDE3_DEPTH_BACK)):
        with Locations(Location((0, 0, 0), (0, 0, 270))):
            Circle(SKETCH9_R)
        with Locations(Location((0, 0, 0), (0, 0, 270))):
            Circle(SKETCH9_R_2, mode=Mode.SUBTRACT)
    extrude(amount=BOSS_EXTRUDE3_DEPTH + BOSS_EXTRUDE3_DEPTH_BACK)

    # Sketch10 → Boss-Extrude4 (add)
    with BuildSketch(Plane(origin=(0, 100, 0), x_dir=(1, 0, 0), z_dir=(0, 1, 0))):
        with Locations(Location((0, 0, 0), (0, 0, 270))):
            Circle(SKETCH10_R)
        with Locations(Location((0, 0, 0), (0, 0, 270))):
            Circle(SKETCH10_R_2, mode=Mode.SUBTRACT)
    extrude(amount=BOSS_EXTRUDE4_DEPTH)


    add(cut_extrude2_piece_3.part)  # Boss-Extrude5 merges Cut-Extrude2 piece 3

    add(cut_extrude2_piece_7.part)  # Boss-Extrude5 merges Cut-Extrude2 piece 7

    add(cut_extrude2_piece_14.part)  # Boss-Extrude5 merges Cut-Extrude2 piece 14

    add(cut_extrude2_piece_15.part)  # Boss-Extrude5 merges Cut-Extrude2 piece 15

    add(cut_extrude2_piece_11.part)  # Boss-Extrude5 merges Cut-Extrude2 piece 11

    add(cut_extrude2_piece_5.part)  # Boss-Extrude5 merges Cut-Extrude2 piece 5

    add(cut_extrude2_piece_1.part)  # Boss-Extrude5 merges Cut-Extrude2 piece 1

    add(cut_extrude2_piece_8.part)  # Boss-Extrude5 merges Cut-Extrude2 piece 8

    add(cut_extrude2_piece_2.part)  # Boss-Extrude5 merges Cut-Extrude2 piece 2

    add(cut_extrude2_piece_13.part)  # Boss-Extrude5 merges Cut-Extrude2 piece 13

    add(cut_extrude2_piece_6.part)  # Boss-Extrude5 merges Cut-Extrude2 piece 6

    add(cut_extrude2_piece_4.part)  # Boss-Extrude5 merges Cut-Extrude2 piece 4

    add(cut_extrude2_piece_12.part)  # Boss-Extrude5 merges Cut-Extrude2 piece 12

    add(cut_extrude2_piece_9.part)  # Boss-Extrude5 merges Cut-Extrude2 piece 9

    add(cut_extrude2_piece_10.part)  # Boss-Extrude5 merges Cut-Extrude2 piece 10
    # Sketch11 → Boss-Extrude5 (add)
    with BuildSketch(Plane.XZ):
        with Locations(Location((0, 0, 0), (0, 0, 90))):
            Circle(SKETCH11_R)
        Circle(SKETCH11_R_2, mode=Mode.SUBTRACT)
    extrude(amount=-BOSS_EXTRUDE5_DEPTH)

    # Sketch12 → Cut-Extrude3 (cut)
    with SkipClean():  # the faces are left unmerged after this step: merging them gives an invalid solid
        with BuildSketch(Plane(origin=(0, 50, 0), x_dir=(1, 0, 0), z_dir=(0, 1, 0))):
            with Locations(Location((0, 0, 0), (0, 0, 100.682739604))):
                Circle(SKETCH12_R)
            with Locations(Location((0, 0, 0), (0, 0, 270))):
                Circle(SKETCH12_R_2, mode=Mode.SUBTRACT)
        extrude(amount=-CUT_EXTRUDE3_DEPTH, mode=Mode.SUBTRACT)
    add(body_16.part.scale(1), mode=Mode.REPLACE)  # the faces are merged on a copy

    # Sketch13 → Cut-Extrude4 (cut)
    with SkipClean():  # the faces are left unmerged after this step: merging them gives an invalid solid
        with BuildSketch(Plane.XZ):
            with Locations(Location((0, 0, 0), (0, 0, 270))):
                Circle(SKETCH13_R)
        extrude(amount=-CUT_EXTRUDE4_DEPTH, mode=Mode.SUBTRACT)

    # Sketch15 → Boss-Extrude6 (add)
    with SkipClean():  # the faces are left unmerged after this step: merging them gives an invalid solid
        with BuildSketch(Plane.XZ.offset(-100)):
            with Locations(Location((0, 0, 0), (0, 0, 270))):
                Circle(SKETCH15_R)
            with Locations(Location((0, 0, 0), (0, 0, 90))):
                Circle(SKETCH15_R_2, mode=Mode.SUBTRACT)
        extrude(amount=BOSS_EXTRUDE6_DEPTH)
    add(body_16.part.scale(1), mode=Mode.REPLACE)  # the faces are merged on a copy

    # Sketch14 → Cut-Extrude5 (cut)
    with SkipClean():  # the faces are left unmerged after this step: merging them gives an invalid solid
        with BuildSketch(Plane(origin=(0, 110.5, 0), x_dir=(1, 0, 0), z_dir=(0, 1, 0))):
            with Locations(Location((-35, 0, 0), (0, 0, 270))):
                Circle(SKETCH14_R)
            with Locations(Location((0, 35, 0), (0, 0, 270))):
                Circle(SKETCH14_R)
            with Locations(Location((35, 0, 0), (0, 0, 270))):
                Circle(SKETCH14_R)
            with Locations(Location((0, -35, 0), (0, 0, 270))):
                Circle(SKETCH14_R)
        extrude(amount=-CUT_EXTRUDE5_DEPTH, mode=Mode.SUBTRACT)

    # Sketch16 → Cut-Extrude6 (cut, two sides: drawn at the far end of the back side and taken through both)
    with SkipClean():  # the faces are left unmerged after this step: merging them gives an invalid solid
        with BuildSketch(Plane(origin=(75.324298868, 0, -43.488504228), x_dir=(0.500000000000001, 0, 0.866025403784438), z_dir=(-0.866025403784438, 0, 0.500000000000001)).offset(-CUT_EXTRUDE6_DEPTH_BACK)):
            with Locations((-8.5, 42.625)):
                Rectangle(SKETCH16_W, SKETCH16_H)
            with Locations((8.5, 42.625)):
                Rectangle(SKETCH16_W, SKETCH16_H)
        extrude(amount=CUT_EXTRUDE6_DEPTH + CUT_EXTRUDE6_DEPTH_BACK, mode=Mode.SUBTRACT)

    # Sketch19 → Cut-Extrude7 (cut, two sides: drawn at the far end of the back side and taken through both)
    with SkipClean():  # the faces are left unmerged after this step: merging them gives an invalid solid
        with BuildSketch(Plane(origin=(-74.038395827, 0, 42.746087761), x_dir=(0.49999999999999983, 0, 0.8660254037844389), z_dir=(-0.8660254037844389, 0, 0.49999999999999983)).offset(-CUT_EXTRUDE7_DEPTH_BACK)):
            with Locations(Location((-2, 20, 0), (0, 0, 180))):
                Circle(SKETCH19_R)
        extrude(amount=CUT_EXTRUDE7_DEPTH + CUT_EXTRUDE7_DEPTH_BACK, mode=Mode.SUBTRACT)

    # Sketch20 → Boss-Extrude7 (add)
    with SkipClean():  # the faces are left unmerged after this step: merging them gives an invalid solid
        with BuildSketch(Plane(origin=(-74.038395827, 0, 42.746087761), x_dir=(0.49999999999999983, 0, 0.8660254037844389), z_dir=(-0.8660254037844389, 0, 0.49999999999999983))):
            with Locations(Location((-2, 20, 0), (0, 0, 180))):
                Circle(SKETCH20_R)
            with Locations((-2, 20)):
                Circle(SKETCH20_R_2, mode=Mode.SUBTRACT)
        extrude(amount=BOSS_EXTRUDE7_DEPTH)

    # Sketch21 → Cut-Extrude8 (cut, through all)
    with SkipClean():  # the faces are left unmerged after this step: merging them gives an invalid solid
        with BuildSketch(Plane(origin=(0, 46, 0), x_dir=(1, 0, 0), z_dir=(0, 1, 0))):
            Polygon((-82.102016671, -28.779486765), (-76.039838845, -25.279486765), (-75.295890879, -26.56804244), align=None)
        extrude(amount=-CUT_EXTRUDE8_DEPTH, mode=Mode.SUBTRACT)


solid = body_16.part
